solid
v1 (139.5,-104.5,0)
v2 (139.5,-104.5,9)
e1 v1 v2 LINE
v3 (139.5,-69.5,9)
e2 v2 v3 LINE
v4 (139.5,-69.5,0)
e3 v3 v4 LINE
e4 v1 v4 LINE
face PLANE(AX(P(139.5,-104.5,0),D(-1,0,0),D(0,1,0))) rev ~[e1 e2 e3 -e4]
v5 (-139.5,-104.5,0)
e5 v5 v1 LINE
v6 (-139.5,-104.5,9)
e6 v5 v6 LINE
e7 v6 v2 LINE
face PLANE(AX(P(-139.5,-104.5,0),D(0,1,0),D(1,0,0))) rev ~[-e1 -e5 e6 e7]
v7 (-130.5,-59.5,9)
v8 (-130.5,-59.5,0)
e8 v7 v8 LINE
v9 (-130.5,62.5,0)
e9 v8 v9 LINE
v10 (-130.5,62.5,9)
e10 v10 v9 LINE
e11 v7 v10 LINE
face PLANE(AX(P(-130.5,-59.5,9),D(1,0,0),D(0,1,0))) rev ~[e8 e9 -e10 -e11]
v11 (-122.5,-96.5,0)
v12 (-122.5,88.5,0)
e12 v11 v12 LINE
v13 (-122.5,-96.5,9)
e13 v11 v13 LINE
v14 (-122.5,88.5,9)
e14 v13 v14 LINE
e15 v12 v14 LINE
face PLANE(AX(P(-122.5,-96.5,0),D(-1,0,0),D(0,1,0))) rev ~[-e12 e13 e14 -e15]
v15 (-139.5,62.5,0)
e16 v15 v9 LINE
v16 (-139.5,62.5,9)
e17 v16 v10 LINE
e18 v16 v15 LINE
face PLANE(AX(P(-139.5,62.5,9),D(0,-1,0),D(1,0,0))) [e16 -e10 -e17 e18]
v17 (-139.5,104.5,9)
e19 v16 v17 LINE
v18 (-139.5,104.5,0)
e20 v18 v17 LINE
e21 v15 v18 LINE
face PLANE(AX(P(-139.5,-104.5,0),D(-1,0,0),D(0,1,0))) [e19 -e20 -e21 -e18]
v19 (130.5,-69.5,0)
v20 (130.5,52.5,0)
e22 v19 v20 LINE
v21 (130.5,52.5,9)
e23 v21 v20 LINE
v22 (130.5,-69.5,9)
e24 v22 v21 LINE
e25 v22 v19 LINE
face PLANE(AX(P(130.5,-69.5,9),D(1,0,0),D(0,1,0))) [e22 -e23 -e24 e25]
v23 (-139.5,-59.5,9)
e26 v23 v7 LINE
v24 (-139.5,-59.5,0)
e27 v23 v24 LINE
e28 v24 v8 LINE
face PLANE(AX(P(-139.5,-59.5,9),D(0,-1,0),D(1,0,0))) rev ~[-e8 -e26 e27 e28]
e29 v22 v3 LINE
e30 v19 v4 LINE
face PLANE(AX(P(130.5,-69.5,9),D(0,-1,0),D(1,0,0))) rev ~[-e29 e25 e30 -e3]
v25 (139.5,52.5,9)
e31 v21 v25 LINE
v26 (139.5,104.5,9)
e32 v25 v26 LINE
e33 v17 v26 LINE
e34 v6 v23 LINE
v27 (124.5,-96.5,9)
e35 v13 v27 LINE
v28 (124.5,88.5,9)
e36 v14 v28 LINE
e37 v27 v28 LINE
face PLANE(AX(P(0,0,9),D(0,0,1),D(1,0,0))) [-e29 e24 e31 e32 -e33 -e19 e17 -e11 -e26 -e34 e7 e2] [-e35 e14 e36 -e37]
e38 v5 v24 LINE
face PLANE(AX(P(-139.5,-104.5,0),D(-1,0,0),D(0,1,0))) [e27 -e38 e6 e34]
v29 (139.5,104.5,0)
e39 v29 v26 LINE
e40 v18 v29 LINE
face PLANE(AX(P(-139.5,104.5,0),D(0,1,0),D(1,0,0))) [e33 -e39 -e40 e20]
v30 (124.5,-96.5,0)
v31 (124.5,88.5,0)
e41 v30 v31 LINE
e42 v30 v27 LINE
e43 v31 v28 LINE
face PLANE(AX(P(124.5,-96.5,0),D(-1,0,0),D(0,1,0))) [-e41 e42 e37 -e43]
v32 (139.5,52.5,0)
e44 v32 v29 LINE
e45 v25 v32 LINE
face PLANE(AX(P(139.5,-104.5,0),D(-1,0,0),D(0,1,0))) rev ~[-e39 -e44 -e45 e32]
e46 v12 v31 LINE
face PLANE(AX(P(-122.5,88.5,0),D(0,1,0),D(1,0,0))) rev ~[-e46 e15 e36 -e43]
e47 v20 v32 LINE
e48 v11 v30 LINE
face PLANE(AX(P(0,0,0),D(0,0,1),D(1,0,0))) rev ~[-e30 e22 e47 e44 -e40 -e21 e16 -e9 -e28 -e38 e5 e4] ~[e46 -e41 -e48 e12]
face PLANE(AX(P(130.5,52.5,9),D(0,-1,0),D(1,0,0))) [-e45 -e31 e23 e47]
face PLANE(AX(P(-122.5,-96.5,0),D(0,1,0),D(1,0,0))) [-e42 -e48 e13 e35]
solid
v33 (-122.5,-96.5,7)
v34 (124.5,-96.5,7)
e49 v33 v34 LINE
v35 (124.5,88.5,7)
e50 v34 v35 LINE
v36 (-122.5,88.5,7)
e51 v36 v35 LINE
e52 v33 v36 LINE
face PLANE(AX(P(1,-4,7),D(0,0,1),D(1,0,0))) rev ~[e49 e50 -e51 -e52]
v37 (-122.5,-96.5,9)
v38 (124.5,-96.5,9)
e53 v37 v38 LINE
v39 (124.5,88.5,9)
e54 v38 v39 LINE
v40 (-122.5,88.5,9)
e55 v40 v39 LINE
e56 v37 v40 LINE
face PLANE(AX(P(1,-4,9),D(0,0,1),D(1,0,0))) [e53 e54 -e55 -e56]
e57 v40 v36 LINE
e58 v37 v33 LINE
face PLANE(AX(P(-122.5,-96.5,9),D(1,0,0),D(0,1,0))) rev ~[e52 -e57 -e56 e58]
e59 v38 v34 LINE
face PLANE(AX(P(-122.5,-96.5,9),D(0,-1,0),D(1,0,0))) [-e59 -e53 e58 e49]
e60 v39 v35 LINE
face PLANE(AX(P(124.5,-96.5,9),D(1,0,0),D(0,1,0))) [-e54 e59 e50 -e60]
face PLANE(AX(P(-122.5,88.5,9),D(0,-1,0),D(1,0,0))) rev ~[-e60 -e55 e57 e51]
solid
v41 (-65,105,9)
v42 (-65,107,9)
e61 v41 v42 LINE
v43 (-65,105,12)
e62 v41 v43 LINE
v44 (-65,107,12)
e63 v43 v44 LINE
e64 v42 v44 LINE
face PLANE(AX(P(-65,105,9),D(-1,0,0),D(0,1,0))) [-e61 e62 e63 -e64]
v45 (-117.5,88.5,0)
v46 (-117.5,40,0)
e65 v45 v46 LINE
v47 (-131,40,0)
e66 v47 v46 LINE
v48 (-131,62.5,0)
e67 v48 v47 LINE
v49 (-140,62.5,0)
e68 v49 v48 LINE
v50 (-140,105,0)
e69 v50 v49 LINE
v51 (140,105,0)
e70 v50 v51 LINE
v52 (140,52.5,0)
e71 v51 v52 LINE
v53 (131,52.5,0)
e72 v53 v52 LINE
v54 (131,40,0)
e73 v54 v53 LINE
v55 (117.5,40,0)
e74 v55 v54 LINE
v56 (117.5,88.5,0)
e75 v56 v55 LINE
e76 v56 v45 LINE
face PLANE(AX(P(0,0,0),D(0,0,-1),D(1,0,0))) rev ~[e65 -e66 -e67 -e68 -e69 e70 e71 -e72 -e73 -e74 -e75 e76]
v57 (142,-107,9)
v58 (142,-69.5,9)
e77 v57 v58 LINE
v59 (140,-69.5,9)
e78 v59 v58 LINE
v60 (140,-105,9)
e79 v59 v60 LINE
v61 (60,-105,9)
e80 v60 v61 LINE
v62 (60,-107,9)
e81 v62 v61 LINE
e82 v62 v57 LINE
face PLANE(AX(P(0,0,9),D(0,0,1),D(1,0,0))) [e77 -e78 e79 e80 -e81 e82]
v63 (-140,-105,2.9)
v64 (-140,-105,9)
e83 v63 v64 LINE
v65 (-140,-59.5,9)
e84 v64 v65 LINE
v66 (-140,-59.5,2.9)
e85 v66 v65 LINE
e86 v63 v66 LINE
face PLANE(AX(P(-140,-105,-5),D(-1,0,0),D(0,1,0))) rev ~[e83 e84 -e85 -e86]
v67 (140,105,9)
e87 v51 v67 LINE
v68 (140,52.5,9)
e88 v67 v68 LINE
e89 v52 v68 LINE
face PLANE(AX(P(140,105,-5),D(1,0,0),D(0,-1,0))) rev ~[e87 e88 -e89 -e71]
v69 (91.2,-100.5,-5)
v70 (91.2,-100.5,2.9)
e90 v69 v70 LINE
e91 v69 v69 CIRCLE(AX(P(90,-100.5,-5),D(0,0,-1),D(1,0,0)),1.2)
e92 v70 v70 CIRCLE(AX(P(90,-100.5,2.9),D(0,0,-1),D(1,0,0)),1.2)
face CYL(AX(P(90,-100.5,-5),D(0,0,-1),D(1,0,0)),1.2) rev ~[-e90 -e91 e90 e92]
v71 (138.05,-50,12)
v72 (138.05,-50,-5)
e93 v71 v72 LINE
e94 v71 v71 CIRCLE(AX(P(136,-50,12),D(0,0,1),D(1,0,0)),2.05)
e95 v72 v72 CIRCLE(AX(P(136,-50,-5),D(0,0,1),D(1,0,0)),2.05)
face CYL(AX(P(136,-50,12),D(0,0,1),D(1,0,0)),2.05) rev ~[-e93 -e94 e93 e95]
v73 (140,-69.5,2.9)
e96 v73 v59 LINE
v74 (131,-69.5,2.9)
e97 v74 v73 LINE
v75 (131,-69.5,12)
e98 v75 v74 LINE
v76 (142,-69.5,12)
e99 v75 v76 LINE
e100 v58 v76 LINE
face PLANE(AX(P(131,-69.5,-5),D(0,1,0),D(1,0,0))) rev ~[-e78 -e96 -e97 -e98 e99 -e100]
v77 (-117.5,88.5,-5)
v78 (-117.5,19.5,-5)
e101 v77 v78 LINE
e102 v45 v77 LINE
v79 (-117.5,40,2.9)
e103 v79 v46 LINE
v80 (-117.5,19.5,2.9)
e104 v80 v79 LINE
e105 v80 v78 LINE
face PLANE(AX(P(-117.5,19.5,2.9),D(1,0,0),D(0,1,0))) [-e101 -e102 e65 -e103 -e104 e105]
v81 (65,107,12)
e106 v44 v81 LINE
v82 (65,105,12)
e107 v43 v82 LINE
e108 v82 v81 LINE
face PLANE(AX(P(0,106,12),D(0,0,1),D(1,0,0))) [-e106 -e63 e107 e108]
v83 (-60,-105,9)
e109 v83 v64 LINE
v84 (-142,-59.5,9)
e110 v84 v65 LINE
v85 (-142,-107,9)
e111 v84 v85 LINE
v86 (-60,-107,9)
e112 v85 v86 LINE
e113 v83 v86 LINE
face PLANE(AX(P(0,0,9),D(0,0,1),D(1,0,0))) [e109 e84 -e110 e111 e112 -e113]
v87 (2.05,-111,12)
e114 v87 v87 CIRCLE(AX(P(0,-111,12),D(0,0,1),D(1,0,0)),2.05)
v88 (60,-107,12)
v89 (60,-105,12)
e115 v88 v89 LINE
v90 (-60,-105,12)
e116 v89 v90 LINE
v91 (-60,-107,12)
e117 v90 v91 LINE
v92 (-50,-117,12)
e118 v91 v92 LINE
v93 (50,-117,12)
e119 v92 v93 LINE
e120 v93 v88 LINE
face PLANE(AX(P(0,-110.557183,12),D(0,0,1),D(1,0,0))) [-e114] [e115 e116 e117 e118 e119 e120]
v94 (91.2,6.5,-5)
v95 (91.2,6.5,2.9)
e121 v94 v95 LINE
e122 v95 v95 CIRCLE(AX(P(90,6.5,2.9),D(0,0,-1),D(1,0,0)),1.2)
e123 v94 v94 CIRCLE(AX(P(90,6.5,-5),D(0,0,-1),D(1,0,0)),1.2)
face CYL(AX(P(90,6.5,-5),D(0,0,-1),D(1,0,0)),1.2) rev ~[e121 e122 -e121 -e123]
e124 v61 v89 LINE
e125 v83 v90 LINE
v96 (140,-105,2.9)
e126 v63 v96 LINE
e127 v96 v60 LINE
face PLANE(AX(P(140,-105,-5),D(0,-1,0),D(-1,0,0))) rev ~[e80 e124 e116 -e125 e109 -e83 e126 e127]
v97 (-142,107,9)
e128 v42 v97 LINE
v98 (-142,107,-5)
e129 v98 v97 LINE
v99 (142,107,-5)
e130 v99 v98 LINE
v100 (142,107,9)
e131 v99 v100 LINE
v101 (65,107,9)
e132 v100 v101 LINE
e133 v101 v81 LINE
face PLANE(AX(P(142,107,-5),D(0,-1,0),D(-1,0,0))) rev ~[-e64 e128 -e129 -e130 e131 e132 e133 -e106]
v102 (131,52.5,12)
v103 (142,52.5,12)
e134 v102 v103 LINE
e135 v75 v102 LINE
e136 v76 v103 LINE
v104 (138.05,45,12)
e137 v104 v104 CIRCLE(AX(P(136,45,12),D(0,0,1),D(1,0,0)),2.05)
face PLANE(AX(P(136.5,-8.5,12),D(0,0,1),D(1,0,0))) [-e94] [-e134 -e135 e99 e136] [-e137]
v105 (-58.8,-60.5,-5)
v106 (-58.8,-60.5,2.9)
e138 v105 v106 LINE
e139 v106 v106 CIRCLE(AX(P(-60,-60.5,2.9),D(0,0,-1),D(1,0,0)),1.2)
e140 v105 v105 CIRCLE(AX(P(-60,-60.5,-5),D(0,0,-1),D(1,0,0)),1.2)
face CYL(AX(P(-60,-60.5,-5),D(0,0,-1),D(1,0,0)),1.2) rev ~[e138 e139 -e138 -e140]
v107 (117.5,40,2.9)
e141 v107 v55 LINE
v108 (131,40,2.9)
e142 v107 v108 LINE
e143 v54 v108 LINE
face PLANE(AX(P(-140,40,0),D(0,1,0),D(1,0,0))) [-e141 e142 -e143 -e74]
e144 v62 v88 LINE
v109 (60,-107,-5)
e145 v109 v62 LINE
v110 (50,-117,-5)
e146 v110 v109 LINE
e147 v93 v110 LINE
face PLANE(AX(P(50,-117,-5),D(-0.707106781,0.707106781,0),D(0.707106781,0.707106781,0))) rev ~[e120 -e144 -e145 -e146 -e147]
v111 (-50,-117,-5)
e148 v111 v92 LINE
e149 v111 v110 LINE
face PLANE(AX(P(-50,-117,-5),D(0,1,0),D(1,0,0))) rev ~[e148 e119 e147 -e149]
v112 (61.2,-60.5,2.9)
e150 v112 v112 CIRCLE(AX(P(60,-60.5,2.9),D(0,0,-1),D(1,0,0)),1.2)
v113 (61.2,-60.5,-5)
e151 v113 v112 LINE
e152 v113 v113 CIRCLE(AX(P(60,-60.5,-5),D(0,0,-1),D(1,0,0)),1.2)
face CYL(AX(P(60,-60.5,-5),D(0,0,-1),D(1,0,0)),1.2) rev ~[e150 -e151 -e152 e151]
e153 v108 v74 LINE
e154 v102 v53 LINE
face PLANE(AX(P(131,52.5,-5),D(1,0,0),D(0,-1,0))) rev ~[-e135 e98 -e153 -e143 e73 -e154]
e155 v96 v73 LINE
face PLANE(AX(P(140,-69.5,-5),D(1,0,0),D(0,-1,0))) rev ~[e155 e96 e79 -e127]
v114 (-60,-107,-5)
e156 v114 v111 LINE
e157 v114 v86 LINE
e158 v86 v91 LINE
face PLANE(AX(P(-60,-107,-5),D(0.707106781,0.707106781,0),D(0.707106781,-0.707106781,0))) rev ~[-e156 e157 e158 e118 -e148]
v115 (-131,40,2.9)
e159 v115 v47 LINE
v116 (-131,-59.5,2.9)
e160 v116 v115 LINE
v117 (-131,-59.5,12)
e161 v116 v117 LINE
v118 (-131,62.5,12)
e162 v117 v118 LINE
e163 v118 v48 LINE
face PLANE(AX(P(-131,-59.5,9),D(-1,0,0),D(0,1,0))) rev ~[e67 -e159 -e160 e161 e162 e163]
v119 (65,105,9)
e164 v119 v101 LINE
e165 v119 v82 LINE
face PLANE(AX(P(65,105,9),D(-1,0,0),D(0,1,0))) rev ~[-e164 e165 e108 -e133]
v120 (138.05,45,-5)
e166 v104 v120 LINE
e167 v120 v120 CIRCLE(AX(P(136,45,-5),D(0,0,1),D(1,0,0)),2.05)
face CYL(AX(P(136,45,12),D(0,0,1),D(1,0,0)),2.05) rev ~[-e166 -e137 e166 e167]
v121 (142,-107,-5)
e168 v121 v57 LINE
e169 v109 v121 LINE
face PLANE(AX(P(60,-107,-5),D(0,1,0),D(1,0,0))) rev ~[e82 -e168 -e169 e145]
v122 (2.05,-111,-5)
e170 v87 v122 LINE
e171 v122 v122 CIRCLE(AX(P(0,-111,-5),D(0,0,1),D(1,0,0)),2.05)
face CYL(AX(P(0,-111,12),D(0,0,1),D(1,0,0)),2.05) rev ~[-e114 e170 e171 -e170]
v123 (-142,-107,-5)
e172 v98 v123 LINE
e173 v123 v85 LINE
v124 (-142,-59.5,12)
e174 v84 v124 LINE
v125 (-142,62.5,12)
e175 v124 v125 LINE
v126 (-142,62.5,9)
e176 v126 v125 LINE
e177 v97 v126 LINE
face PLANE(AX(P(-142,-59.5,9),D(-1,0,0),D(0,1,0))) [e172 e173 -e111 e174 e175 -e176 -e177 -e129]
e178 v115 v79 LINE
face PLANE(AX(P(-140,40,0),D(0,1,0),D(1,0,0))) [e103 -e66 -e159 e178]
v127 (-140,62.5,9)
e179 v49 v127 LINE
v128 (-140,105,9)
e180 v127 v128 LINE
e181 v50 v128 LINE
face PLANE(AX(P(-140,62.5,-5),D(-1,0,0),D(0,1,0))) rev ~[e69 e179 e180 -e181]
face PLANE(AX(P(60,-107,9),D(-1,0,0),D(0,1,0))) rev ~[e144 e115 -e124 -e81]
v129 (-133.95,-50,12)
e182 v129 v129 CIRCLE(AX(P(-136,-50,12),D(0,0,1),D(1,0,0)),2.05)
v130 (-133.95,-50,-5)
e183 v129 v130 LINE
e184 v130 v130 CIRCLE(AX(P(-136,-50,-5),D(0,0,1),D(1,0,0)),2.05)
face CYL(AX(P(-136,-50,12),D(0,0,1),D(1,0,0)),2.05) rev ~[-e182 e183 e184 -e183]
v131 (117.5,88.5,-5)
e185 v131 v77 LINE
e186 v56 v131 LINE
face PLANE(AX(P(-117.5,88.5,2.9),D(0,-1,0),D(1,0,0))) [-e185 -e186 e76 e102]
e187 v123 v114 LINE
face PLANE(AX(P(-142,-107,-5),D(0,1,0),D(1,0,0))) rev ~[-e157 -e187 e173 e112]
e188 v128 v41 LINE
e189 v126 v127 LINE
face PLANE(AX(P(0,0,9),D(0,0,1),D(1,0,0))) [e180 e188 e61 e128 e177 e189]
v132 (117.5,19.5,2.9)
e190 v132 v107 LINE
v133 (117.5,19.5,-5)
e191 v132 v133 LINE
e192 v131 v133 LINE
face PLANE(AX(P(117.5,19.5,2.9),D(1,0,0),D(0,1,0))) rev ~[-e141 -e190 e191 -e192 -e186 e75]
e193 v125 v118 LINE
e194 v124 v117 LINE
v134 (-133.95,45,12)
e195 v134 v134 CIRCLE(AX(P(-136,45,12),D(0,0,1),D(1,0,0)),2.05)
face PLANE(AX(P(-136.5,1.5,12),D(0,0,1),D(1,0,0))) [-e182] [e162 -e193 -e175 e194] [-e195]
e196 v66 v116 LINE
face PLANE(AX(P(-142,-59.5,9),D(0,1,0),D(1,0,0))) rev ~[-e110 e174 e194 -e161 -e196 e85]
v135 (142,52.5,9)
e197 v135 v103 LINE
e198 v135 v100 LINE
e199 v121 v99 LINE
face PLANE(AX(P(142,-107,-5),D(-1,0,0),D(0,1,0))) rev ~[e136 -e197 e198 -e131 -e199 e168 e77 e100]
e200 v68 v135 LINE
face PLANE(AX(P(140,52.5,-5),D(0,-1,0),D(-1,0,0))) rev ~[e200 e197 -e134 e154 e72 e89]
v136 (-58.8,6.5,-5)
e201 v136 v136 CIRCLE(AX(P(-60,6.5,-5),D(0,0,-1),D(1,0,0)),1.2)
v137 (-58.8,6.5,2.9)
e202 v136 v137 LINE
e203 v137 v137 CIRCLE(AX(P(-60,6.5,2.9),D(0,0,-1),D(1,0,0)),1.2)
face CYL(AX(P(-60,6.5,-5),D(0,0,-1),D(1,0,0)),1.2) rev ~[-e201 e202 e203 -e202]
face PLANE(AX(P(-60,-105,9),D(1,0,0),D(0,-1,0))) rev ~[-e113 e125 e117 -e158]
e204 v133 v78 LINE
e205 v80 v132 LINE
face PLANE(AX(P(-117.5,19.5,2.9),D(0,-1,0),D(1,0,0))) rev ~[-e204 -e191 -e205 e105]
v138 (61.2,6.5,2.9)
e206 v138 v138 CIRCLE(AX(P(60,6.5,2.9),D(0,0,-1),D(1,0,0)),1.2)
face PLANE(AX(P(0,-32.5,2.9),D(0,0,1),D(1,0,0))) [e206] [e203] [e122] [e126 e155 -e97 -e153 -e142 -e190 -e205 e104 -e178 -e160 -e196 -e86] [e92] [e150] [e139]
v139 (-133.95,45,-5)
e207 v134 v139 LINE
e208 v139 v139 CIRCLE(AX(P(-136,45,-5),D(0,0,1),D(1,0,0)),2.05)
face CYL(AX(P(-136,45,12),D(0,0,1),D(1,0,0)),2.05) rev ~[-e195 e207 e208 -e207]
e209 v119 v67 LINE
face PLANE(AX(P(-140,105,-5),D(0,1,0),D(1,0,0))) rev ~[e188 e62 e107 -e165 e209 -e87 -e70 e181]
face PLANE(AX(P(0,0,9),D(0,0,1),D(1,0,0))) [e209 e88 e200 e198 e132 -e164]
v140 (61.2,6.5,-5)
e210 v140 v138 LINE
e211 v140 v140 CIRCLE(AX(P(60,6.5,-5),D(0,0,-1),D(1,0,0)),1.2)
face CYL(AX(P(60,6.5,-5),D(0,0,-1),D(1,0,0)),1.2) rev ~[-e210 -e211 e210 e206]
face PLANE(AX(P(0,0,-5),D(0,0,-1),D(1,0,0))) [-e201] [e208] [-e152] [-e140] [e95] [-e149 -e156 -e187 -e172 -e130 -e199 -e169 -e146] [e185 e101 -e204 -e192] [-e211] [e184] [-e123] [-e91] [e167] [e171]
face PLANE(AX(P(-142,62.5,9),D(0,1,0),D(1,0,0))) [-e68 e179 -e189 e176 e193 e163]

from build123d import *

# Parameters (mm, degrees)
F0_W      = 279
F0_H      = 209
F0_W_2    = 247
F0_H_2    = 185
F1_DEPTH  = 9
F2_W      = 9
F2_H      = 122
F3_DEPTH  = 25
F6_DEPTH  = 14
F7_W      = 280
F7_H      = 210
F8_DEPTH  = 5
F9_W      = 280
F9_H      = 145
F10_DEPTH = 2.9
F11_W     = 235
F11_H     = 69
F12_DEPTH = 25
F13_R     = 1.2
F14_DEPTH = 25
F15_W     = 11
F15_H     = 122
F15_W_2   = 130
F15_H_2   = 2
F16_DEPTH = 3
F17_R     = 2.05
F18_DEPTH = 25
F19_W     = 247
F19_H     = 185
F20_DEPTH = 2


with BuildPart() as f1:
    # F0 (on Top) → F1 (new body)
    with BuildSketch(Plane.XY):
        Rectangle(F0_W, F0_H)
        with Locations((1, -4)):
            Rectangle(F0_W_2, F0_H_2, mode=Mode.SUBTRACT)
    extrude(amount=F1_DEPTH)

    # F2 (on face) → F3 (cut)
    with BuildSketch(Plane.XY.offset(9)):
        with Locations((-135, 1.5)):
            Rectangle(F2_W, F2_H)
        with Locations((135, -8.5)):
            Rectangle(F2_W, F2_H)
    extrude(amount=-F3_DEPTH, mode=Mode.SUBTRACT)


with BuildPart() as f6:
    # F5 (on offset) → F6 (new body)
    with BuildSketch(Plane.XY.offset(-5)):
        Polygon((142, 107), (-142, 107), (-142, -107), (-60, -107), (60, -107), (142, -107), align=None)
        Polygon((-140, 62.5), (-140, 105), (140, 105), (140, 52.5), (131, 52.5), (131, -69.5), (140, -69.5), (140, -105), (-140, -105), (-140, -59.5), (-131, -59.5), (-131, 62.5), align=None, mode=Mode.SUBTRACT)
        Polygon((60, -107), (-60, -107), (-50, -117), (50, -117), align=None)
    extrude(amount=F6_DEPTH)

    # F7 (on face) → F8 (join)
    with BuildSketch(Plane(origin=(0, 0, -5), x_dir=(1, 0, 0), z_dir=(0, 0, -1))):
        Rectangle(F7_W, F7_H)
    extrude(amount=-F8_DEPTH)

    # F9 (on face) → F10 (join)
    with BuildSketch(Plane.XY):
        with Locations((0, -32.5)):
            Rectangle(F9_W, F9_H)
    extrude(amount=F10_DEPTH)

    # F11 (on face) → F12 (cut)
    with BuildSketch(Plane.XY.offset(2.9)):
        with Locations((0, 54)):
            Rectangle(F11_W, F11_H)
    extrude(amount=-F12_DEPTH, mode=Mode.SUBTRACT)

    # F13 (on face) → F14 (cut)
    with BuildSketch(Plane(origin=(0, 0, -5), x_dir=(1, 0, 0), z_dir=(0, 0, -1))):
        with Locations((90, -6.5)):
            Circle(F13_R)
        with Locations((90, 100.5)):
            Circle(F13_R)
        with Locations((60, 60.5)):
            Circle(F13_R)
        with Locations((60, -6.5)):
            Circle(F13_R)
        with Locations((-60, 60.5)):
            Circle(F13_R)
        with Locations((-60, -6.5)):
            Circle(F13_R)
    extrude(amount=-F14_DEPTH, mode=Mode.SUBTRACT)

    # F15 (on face) → F16 (join)
    with BuildSketch(Plane.XY.offset(9)):
        with Locations((-136.5, 1.5)):
            Rectangle(F15_W, F15_H)
        with Locations((136.5, -8.5)):
            Rectangle(F15_W, F15_H)
        with Locations((0, 106)):
            Rectangle(F15_W_2, F15_H_2)
        Polygon((-60, -107), (-50, -117), (50, -117), (60, -107), (60, -105), (-60, -105), align=None)
    extrude(amount=F16_DEPTH)

    # F17 (on face) → F18 (cut)
    with BuildSketch(Plane.XY.offset(12)):
        with Locations((-136, 45)):
            Circle(F17_R)
        with Locations((-136, -50)):
            Circle(F17_R)
        with Locations((136, -50)):
            Circle(F17_R)
        with Locations((136, 45)):
            Circle(F17_R)
        with Locations((0, -111)):
            Circle(F17_R)
    extrude(amount=-F18_DEPTH, mode=Mode.SUBTRACT)


with BuildPart() as f20:
    # F19 (on face) → F20 (new body)
    with BuildSketch(Plane.XY.offset(9)):
        with Locations((1, -4)):
            Rectangle(F19_W, F19_H)
    extrude(amount=-F20_DEPTH)


solid = Compound([f1.part, f6.part, f20.part])
